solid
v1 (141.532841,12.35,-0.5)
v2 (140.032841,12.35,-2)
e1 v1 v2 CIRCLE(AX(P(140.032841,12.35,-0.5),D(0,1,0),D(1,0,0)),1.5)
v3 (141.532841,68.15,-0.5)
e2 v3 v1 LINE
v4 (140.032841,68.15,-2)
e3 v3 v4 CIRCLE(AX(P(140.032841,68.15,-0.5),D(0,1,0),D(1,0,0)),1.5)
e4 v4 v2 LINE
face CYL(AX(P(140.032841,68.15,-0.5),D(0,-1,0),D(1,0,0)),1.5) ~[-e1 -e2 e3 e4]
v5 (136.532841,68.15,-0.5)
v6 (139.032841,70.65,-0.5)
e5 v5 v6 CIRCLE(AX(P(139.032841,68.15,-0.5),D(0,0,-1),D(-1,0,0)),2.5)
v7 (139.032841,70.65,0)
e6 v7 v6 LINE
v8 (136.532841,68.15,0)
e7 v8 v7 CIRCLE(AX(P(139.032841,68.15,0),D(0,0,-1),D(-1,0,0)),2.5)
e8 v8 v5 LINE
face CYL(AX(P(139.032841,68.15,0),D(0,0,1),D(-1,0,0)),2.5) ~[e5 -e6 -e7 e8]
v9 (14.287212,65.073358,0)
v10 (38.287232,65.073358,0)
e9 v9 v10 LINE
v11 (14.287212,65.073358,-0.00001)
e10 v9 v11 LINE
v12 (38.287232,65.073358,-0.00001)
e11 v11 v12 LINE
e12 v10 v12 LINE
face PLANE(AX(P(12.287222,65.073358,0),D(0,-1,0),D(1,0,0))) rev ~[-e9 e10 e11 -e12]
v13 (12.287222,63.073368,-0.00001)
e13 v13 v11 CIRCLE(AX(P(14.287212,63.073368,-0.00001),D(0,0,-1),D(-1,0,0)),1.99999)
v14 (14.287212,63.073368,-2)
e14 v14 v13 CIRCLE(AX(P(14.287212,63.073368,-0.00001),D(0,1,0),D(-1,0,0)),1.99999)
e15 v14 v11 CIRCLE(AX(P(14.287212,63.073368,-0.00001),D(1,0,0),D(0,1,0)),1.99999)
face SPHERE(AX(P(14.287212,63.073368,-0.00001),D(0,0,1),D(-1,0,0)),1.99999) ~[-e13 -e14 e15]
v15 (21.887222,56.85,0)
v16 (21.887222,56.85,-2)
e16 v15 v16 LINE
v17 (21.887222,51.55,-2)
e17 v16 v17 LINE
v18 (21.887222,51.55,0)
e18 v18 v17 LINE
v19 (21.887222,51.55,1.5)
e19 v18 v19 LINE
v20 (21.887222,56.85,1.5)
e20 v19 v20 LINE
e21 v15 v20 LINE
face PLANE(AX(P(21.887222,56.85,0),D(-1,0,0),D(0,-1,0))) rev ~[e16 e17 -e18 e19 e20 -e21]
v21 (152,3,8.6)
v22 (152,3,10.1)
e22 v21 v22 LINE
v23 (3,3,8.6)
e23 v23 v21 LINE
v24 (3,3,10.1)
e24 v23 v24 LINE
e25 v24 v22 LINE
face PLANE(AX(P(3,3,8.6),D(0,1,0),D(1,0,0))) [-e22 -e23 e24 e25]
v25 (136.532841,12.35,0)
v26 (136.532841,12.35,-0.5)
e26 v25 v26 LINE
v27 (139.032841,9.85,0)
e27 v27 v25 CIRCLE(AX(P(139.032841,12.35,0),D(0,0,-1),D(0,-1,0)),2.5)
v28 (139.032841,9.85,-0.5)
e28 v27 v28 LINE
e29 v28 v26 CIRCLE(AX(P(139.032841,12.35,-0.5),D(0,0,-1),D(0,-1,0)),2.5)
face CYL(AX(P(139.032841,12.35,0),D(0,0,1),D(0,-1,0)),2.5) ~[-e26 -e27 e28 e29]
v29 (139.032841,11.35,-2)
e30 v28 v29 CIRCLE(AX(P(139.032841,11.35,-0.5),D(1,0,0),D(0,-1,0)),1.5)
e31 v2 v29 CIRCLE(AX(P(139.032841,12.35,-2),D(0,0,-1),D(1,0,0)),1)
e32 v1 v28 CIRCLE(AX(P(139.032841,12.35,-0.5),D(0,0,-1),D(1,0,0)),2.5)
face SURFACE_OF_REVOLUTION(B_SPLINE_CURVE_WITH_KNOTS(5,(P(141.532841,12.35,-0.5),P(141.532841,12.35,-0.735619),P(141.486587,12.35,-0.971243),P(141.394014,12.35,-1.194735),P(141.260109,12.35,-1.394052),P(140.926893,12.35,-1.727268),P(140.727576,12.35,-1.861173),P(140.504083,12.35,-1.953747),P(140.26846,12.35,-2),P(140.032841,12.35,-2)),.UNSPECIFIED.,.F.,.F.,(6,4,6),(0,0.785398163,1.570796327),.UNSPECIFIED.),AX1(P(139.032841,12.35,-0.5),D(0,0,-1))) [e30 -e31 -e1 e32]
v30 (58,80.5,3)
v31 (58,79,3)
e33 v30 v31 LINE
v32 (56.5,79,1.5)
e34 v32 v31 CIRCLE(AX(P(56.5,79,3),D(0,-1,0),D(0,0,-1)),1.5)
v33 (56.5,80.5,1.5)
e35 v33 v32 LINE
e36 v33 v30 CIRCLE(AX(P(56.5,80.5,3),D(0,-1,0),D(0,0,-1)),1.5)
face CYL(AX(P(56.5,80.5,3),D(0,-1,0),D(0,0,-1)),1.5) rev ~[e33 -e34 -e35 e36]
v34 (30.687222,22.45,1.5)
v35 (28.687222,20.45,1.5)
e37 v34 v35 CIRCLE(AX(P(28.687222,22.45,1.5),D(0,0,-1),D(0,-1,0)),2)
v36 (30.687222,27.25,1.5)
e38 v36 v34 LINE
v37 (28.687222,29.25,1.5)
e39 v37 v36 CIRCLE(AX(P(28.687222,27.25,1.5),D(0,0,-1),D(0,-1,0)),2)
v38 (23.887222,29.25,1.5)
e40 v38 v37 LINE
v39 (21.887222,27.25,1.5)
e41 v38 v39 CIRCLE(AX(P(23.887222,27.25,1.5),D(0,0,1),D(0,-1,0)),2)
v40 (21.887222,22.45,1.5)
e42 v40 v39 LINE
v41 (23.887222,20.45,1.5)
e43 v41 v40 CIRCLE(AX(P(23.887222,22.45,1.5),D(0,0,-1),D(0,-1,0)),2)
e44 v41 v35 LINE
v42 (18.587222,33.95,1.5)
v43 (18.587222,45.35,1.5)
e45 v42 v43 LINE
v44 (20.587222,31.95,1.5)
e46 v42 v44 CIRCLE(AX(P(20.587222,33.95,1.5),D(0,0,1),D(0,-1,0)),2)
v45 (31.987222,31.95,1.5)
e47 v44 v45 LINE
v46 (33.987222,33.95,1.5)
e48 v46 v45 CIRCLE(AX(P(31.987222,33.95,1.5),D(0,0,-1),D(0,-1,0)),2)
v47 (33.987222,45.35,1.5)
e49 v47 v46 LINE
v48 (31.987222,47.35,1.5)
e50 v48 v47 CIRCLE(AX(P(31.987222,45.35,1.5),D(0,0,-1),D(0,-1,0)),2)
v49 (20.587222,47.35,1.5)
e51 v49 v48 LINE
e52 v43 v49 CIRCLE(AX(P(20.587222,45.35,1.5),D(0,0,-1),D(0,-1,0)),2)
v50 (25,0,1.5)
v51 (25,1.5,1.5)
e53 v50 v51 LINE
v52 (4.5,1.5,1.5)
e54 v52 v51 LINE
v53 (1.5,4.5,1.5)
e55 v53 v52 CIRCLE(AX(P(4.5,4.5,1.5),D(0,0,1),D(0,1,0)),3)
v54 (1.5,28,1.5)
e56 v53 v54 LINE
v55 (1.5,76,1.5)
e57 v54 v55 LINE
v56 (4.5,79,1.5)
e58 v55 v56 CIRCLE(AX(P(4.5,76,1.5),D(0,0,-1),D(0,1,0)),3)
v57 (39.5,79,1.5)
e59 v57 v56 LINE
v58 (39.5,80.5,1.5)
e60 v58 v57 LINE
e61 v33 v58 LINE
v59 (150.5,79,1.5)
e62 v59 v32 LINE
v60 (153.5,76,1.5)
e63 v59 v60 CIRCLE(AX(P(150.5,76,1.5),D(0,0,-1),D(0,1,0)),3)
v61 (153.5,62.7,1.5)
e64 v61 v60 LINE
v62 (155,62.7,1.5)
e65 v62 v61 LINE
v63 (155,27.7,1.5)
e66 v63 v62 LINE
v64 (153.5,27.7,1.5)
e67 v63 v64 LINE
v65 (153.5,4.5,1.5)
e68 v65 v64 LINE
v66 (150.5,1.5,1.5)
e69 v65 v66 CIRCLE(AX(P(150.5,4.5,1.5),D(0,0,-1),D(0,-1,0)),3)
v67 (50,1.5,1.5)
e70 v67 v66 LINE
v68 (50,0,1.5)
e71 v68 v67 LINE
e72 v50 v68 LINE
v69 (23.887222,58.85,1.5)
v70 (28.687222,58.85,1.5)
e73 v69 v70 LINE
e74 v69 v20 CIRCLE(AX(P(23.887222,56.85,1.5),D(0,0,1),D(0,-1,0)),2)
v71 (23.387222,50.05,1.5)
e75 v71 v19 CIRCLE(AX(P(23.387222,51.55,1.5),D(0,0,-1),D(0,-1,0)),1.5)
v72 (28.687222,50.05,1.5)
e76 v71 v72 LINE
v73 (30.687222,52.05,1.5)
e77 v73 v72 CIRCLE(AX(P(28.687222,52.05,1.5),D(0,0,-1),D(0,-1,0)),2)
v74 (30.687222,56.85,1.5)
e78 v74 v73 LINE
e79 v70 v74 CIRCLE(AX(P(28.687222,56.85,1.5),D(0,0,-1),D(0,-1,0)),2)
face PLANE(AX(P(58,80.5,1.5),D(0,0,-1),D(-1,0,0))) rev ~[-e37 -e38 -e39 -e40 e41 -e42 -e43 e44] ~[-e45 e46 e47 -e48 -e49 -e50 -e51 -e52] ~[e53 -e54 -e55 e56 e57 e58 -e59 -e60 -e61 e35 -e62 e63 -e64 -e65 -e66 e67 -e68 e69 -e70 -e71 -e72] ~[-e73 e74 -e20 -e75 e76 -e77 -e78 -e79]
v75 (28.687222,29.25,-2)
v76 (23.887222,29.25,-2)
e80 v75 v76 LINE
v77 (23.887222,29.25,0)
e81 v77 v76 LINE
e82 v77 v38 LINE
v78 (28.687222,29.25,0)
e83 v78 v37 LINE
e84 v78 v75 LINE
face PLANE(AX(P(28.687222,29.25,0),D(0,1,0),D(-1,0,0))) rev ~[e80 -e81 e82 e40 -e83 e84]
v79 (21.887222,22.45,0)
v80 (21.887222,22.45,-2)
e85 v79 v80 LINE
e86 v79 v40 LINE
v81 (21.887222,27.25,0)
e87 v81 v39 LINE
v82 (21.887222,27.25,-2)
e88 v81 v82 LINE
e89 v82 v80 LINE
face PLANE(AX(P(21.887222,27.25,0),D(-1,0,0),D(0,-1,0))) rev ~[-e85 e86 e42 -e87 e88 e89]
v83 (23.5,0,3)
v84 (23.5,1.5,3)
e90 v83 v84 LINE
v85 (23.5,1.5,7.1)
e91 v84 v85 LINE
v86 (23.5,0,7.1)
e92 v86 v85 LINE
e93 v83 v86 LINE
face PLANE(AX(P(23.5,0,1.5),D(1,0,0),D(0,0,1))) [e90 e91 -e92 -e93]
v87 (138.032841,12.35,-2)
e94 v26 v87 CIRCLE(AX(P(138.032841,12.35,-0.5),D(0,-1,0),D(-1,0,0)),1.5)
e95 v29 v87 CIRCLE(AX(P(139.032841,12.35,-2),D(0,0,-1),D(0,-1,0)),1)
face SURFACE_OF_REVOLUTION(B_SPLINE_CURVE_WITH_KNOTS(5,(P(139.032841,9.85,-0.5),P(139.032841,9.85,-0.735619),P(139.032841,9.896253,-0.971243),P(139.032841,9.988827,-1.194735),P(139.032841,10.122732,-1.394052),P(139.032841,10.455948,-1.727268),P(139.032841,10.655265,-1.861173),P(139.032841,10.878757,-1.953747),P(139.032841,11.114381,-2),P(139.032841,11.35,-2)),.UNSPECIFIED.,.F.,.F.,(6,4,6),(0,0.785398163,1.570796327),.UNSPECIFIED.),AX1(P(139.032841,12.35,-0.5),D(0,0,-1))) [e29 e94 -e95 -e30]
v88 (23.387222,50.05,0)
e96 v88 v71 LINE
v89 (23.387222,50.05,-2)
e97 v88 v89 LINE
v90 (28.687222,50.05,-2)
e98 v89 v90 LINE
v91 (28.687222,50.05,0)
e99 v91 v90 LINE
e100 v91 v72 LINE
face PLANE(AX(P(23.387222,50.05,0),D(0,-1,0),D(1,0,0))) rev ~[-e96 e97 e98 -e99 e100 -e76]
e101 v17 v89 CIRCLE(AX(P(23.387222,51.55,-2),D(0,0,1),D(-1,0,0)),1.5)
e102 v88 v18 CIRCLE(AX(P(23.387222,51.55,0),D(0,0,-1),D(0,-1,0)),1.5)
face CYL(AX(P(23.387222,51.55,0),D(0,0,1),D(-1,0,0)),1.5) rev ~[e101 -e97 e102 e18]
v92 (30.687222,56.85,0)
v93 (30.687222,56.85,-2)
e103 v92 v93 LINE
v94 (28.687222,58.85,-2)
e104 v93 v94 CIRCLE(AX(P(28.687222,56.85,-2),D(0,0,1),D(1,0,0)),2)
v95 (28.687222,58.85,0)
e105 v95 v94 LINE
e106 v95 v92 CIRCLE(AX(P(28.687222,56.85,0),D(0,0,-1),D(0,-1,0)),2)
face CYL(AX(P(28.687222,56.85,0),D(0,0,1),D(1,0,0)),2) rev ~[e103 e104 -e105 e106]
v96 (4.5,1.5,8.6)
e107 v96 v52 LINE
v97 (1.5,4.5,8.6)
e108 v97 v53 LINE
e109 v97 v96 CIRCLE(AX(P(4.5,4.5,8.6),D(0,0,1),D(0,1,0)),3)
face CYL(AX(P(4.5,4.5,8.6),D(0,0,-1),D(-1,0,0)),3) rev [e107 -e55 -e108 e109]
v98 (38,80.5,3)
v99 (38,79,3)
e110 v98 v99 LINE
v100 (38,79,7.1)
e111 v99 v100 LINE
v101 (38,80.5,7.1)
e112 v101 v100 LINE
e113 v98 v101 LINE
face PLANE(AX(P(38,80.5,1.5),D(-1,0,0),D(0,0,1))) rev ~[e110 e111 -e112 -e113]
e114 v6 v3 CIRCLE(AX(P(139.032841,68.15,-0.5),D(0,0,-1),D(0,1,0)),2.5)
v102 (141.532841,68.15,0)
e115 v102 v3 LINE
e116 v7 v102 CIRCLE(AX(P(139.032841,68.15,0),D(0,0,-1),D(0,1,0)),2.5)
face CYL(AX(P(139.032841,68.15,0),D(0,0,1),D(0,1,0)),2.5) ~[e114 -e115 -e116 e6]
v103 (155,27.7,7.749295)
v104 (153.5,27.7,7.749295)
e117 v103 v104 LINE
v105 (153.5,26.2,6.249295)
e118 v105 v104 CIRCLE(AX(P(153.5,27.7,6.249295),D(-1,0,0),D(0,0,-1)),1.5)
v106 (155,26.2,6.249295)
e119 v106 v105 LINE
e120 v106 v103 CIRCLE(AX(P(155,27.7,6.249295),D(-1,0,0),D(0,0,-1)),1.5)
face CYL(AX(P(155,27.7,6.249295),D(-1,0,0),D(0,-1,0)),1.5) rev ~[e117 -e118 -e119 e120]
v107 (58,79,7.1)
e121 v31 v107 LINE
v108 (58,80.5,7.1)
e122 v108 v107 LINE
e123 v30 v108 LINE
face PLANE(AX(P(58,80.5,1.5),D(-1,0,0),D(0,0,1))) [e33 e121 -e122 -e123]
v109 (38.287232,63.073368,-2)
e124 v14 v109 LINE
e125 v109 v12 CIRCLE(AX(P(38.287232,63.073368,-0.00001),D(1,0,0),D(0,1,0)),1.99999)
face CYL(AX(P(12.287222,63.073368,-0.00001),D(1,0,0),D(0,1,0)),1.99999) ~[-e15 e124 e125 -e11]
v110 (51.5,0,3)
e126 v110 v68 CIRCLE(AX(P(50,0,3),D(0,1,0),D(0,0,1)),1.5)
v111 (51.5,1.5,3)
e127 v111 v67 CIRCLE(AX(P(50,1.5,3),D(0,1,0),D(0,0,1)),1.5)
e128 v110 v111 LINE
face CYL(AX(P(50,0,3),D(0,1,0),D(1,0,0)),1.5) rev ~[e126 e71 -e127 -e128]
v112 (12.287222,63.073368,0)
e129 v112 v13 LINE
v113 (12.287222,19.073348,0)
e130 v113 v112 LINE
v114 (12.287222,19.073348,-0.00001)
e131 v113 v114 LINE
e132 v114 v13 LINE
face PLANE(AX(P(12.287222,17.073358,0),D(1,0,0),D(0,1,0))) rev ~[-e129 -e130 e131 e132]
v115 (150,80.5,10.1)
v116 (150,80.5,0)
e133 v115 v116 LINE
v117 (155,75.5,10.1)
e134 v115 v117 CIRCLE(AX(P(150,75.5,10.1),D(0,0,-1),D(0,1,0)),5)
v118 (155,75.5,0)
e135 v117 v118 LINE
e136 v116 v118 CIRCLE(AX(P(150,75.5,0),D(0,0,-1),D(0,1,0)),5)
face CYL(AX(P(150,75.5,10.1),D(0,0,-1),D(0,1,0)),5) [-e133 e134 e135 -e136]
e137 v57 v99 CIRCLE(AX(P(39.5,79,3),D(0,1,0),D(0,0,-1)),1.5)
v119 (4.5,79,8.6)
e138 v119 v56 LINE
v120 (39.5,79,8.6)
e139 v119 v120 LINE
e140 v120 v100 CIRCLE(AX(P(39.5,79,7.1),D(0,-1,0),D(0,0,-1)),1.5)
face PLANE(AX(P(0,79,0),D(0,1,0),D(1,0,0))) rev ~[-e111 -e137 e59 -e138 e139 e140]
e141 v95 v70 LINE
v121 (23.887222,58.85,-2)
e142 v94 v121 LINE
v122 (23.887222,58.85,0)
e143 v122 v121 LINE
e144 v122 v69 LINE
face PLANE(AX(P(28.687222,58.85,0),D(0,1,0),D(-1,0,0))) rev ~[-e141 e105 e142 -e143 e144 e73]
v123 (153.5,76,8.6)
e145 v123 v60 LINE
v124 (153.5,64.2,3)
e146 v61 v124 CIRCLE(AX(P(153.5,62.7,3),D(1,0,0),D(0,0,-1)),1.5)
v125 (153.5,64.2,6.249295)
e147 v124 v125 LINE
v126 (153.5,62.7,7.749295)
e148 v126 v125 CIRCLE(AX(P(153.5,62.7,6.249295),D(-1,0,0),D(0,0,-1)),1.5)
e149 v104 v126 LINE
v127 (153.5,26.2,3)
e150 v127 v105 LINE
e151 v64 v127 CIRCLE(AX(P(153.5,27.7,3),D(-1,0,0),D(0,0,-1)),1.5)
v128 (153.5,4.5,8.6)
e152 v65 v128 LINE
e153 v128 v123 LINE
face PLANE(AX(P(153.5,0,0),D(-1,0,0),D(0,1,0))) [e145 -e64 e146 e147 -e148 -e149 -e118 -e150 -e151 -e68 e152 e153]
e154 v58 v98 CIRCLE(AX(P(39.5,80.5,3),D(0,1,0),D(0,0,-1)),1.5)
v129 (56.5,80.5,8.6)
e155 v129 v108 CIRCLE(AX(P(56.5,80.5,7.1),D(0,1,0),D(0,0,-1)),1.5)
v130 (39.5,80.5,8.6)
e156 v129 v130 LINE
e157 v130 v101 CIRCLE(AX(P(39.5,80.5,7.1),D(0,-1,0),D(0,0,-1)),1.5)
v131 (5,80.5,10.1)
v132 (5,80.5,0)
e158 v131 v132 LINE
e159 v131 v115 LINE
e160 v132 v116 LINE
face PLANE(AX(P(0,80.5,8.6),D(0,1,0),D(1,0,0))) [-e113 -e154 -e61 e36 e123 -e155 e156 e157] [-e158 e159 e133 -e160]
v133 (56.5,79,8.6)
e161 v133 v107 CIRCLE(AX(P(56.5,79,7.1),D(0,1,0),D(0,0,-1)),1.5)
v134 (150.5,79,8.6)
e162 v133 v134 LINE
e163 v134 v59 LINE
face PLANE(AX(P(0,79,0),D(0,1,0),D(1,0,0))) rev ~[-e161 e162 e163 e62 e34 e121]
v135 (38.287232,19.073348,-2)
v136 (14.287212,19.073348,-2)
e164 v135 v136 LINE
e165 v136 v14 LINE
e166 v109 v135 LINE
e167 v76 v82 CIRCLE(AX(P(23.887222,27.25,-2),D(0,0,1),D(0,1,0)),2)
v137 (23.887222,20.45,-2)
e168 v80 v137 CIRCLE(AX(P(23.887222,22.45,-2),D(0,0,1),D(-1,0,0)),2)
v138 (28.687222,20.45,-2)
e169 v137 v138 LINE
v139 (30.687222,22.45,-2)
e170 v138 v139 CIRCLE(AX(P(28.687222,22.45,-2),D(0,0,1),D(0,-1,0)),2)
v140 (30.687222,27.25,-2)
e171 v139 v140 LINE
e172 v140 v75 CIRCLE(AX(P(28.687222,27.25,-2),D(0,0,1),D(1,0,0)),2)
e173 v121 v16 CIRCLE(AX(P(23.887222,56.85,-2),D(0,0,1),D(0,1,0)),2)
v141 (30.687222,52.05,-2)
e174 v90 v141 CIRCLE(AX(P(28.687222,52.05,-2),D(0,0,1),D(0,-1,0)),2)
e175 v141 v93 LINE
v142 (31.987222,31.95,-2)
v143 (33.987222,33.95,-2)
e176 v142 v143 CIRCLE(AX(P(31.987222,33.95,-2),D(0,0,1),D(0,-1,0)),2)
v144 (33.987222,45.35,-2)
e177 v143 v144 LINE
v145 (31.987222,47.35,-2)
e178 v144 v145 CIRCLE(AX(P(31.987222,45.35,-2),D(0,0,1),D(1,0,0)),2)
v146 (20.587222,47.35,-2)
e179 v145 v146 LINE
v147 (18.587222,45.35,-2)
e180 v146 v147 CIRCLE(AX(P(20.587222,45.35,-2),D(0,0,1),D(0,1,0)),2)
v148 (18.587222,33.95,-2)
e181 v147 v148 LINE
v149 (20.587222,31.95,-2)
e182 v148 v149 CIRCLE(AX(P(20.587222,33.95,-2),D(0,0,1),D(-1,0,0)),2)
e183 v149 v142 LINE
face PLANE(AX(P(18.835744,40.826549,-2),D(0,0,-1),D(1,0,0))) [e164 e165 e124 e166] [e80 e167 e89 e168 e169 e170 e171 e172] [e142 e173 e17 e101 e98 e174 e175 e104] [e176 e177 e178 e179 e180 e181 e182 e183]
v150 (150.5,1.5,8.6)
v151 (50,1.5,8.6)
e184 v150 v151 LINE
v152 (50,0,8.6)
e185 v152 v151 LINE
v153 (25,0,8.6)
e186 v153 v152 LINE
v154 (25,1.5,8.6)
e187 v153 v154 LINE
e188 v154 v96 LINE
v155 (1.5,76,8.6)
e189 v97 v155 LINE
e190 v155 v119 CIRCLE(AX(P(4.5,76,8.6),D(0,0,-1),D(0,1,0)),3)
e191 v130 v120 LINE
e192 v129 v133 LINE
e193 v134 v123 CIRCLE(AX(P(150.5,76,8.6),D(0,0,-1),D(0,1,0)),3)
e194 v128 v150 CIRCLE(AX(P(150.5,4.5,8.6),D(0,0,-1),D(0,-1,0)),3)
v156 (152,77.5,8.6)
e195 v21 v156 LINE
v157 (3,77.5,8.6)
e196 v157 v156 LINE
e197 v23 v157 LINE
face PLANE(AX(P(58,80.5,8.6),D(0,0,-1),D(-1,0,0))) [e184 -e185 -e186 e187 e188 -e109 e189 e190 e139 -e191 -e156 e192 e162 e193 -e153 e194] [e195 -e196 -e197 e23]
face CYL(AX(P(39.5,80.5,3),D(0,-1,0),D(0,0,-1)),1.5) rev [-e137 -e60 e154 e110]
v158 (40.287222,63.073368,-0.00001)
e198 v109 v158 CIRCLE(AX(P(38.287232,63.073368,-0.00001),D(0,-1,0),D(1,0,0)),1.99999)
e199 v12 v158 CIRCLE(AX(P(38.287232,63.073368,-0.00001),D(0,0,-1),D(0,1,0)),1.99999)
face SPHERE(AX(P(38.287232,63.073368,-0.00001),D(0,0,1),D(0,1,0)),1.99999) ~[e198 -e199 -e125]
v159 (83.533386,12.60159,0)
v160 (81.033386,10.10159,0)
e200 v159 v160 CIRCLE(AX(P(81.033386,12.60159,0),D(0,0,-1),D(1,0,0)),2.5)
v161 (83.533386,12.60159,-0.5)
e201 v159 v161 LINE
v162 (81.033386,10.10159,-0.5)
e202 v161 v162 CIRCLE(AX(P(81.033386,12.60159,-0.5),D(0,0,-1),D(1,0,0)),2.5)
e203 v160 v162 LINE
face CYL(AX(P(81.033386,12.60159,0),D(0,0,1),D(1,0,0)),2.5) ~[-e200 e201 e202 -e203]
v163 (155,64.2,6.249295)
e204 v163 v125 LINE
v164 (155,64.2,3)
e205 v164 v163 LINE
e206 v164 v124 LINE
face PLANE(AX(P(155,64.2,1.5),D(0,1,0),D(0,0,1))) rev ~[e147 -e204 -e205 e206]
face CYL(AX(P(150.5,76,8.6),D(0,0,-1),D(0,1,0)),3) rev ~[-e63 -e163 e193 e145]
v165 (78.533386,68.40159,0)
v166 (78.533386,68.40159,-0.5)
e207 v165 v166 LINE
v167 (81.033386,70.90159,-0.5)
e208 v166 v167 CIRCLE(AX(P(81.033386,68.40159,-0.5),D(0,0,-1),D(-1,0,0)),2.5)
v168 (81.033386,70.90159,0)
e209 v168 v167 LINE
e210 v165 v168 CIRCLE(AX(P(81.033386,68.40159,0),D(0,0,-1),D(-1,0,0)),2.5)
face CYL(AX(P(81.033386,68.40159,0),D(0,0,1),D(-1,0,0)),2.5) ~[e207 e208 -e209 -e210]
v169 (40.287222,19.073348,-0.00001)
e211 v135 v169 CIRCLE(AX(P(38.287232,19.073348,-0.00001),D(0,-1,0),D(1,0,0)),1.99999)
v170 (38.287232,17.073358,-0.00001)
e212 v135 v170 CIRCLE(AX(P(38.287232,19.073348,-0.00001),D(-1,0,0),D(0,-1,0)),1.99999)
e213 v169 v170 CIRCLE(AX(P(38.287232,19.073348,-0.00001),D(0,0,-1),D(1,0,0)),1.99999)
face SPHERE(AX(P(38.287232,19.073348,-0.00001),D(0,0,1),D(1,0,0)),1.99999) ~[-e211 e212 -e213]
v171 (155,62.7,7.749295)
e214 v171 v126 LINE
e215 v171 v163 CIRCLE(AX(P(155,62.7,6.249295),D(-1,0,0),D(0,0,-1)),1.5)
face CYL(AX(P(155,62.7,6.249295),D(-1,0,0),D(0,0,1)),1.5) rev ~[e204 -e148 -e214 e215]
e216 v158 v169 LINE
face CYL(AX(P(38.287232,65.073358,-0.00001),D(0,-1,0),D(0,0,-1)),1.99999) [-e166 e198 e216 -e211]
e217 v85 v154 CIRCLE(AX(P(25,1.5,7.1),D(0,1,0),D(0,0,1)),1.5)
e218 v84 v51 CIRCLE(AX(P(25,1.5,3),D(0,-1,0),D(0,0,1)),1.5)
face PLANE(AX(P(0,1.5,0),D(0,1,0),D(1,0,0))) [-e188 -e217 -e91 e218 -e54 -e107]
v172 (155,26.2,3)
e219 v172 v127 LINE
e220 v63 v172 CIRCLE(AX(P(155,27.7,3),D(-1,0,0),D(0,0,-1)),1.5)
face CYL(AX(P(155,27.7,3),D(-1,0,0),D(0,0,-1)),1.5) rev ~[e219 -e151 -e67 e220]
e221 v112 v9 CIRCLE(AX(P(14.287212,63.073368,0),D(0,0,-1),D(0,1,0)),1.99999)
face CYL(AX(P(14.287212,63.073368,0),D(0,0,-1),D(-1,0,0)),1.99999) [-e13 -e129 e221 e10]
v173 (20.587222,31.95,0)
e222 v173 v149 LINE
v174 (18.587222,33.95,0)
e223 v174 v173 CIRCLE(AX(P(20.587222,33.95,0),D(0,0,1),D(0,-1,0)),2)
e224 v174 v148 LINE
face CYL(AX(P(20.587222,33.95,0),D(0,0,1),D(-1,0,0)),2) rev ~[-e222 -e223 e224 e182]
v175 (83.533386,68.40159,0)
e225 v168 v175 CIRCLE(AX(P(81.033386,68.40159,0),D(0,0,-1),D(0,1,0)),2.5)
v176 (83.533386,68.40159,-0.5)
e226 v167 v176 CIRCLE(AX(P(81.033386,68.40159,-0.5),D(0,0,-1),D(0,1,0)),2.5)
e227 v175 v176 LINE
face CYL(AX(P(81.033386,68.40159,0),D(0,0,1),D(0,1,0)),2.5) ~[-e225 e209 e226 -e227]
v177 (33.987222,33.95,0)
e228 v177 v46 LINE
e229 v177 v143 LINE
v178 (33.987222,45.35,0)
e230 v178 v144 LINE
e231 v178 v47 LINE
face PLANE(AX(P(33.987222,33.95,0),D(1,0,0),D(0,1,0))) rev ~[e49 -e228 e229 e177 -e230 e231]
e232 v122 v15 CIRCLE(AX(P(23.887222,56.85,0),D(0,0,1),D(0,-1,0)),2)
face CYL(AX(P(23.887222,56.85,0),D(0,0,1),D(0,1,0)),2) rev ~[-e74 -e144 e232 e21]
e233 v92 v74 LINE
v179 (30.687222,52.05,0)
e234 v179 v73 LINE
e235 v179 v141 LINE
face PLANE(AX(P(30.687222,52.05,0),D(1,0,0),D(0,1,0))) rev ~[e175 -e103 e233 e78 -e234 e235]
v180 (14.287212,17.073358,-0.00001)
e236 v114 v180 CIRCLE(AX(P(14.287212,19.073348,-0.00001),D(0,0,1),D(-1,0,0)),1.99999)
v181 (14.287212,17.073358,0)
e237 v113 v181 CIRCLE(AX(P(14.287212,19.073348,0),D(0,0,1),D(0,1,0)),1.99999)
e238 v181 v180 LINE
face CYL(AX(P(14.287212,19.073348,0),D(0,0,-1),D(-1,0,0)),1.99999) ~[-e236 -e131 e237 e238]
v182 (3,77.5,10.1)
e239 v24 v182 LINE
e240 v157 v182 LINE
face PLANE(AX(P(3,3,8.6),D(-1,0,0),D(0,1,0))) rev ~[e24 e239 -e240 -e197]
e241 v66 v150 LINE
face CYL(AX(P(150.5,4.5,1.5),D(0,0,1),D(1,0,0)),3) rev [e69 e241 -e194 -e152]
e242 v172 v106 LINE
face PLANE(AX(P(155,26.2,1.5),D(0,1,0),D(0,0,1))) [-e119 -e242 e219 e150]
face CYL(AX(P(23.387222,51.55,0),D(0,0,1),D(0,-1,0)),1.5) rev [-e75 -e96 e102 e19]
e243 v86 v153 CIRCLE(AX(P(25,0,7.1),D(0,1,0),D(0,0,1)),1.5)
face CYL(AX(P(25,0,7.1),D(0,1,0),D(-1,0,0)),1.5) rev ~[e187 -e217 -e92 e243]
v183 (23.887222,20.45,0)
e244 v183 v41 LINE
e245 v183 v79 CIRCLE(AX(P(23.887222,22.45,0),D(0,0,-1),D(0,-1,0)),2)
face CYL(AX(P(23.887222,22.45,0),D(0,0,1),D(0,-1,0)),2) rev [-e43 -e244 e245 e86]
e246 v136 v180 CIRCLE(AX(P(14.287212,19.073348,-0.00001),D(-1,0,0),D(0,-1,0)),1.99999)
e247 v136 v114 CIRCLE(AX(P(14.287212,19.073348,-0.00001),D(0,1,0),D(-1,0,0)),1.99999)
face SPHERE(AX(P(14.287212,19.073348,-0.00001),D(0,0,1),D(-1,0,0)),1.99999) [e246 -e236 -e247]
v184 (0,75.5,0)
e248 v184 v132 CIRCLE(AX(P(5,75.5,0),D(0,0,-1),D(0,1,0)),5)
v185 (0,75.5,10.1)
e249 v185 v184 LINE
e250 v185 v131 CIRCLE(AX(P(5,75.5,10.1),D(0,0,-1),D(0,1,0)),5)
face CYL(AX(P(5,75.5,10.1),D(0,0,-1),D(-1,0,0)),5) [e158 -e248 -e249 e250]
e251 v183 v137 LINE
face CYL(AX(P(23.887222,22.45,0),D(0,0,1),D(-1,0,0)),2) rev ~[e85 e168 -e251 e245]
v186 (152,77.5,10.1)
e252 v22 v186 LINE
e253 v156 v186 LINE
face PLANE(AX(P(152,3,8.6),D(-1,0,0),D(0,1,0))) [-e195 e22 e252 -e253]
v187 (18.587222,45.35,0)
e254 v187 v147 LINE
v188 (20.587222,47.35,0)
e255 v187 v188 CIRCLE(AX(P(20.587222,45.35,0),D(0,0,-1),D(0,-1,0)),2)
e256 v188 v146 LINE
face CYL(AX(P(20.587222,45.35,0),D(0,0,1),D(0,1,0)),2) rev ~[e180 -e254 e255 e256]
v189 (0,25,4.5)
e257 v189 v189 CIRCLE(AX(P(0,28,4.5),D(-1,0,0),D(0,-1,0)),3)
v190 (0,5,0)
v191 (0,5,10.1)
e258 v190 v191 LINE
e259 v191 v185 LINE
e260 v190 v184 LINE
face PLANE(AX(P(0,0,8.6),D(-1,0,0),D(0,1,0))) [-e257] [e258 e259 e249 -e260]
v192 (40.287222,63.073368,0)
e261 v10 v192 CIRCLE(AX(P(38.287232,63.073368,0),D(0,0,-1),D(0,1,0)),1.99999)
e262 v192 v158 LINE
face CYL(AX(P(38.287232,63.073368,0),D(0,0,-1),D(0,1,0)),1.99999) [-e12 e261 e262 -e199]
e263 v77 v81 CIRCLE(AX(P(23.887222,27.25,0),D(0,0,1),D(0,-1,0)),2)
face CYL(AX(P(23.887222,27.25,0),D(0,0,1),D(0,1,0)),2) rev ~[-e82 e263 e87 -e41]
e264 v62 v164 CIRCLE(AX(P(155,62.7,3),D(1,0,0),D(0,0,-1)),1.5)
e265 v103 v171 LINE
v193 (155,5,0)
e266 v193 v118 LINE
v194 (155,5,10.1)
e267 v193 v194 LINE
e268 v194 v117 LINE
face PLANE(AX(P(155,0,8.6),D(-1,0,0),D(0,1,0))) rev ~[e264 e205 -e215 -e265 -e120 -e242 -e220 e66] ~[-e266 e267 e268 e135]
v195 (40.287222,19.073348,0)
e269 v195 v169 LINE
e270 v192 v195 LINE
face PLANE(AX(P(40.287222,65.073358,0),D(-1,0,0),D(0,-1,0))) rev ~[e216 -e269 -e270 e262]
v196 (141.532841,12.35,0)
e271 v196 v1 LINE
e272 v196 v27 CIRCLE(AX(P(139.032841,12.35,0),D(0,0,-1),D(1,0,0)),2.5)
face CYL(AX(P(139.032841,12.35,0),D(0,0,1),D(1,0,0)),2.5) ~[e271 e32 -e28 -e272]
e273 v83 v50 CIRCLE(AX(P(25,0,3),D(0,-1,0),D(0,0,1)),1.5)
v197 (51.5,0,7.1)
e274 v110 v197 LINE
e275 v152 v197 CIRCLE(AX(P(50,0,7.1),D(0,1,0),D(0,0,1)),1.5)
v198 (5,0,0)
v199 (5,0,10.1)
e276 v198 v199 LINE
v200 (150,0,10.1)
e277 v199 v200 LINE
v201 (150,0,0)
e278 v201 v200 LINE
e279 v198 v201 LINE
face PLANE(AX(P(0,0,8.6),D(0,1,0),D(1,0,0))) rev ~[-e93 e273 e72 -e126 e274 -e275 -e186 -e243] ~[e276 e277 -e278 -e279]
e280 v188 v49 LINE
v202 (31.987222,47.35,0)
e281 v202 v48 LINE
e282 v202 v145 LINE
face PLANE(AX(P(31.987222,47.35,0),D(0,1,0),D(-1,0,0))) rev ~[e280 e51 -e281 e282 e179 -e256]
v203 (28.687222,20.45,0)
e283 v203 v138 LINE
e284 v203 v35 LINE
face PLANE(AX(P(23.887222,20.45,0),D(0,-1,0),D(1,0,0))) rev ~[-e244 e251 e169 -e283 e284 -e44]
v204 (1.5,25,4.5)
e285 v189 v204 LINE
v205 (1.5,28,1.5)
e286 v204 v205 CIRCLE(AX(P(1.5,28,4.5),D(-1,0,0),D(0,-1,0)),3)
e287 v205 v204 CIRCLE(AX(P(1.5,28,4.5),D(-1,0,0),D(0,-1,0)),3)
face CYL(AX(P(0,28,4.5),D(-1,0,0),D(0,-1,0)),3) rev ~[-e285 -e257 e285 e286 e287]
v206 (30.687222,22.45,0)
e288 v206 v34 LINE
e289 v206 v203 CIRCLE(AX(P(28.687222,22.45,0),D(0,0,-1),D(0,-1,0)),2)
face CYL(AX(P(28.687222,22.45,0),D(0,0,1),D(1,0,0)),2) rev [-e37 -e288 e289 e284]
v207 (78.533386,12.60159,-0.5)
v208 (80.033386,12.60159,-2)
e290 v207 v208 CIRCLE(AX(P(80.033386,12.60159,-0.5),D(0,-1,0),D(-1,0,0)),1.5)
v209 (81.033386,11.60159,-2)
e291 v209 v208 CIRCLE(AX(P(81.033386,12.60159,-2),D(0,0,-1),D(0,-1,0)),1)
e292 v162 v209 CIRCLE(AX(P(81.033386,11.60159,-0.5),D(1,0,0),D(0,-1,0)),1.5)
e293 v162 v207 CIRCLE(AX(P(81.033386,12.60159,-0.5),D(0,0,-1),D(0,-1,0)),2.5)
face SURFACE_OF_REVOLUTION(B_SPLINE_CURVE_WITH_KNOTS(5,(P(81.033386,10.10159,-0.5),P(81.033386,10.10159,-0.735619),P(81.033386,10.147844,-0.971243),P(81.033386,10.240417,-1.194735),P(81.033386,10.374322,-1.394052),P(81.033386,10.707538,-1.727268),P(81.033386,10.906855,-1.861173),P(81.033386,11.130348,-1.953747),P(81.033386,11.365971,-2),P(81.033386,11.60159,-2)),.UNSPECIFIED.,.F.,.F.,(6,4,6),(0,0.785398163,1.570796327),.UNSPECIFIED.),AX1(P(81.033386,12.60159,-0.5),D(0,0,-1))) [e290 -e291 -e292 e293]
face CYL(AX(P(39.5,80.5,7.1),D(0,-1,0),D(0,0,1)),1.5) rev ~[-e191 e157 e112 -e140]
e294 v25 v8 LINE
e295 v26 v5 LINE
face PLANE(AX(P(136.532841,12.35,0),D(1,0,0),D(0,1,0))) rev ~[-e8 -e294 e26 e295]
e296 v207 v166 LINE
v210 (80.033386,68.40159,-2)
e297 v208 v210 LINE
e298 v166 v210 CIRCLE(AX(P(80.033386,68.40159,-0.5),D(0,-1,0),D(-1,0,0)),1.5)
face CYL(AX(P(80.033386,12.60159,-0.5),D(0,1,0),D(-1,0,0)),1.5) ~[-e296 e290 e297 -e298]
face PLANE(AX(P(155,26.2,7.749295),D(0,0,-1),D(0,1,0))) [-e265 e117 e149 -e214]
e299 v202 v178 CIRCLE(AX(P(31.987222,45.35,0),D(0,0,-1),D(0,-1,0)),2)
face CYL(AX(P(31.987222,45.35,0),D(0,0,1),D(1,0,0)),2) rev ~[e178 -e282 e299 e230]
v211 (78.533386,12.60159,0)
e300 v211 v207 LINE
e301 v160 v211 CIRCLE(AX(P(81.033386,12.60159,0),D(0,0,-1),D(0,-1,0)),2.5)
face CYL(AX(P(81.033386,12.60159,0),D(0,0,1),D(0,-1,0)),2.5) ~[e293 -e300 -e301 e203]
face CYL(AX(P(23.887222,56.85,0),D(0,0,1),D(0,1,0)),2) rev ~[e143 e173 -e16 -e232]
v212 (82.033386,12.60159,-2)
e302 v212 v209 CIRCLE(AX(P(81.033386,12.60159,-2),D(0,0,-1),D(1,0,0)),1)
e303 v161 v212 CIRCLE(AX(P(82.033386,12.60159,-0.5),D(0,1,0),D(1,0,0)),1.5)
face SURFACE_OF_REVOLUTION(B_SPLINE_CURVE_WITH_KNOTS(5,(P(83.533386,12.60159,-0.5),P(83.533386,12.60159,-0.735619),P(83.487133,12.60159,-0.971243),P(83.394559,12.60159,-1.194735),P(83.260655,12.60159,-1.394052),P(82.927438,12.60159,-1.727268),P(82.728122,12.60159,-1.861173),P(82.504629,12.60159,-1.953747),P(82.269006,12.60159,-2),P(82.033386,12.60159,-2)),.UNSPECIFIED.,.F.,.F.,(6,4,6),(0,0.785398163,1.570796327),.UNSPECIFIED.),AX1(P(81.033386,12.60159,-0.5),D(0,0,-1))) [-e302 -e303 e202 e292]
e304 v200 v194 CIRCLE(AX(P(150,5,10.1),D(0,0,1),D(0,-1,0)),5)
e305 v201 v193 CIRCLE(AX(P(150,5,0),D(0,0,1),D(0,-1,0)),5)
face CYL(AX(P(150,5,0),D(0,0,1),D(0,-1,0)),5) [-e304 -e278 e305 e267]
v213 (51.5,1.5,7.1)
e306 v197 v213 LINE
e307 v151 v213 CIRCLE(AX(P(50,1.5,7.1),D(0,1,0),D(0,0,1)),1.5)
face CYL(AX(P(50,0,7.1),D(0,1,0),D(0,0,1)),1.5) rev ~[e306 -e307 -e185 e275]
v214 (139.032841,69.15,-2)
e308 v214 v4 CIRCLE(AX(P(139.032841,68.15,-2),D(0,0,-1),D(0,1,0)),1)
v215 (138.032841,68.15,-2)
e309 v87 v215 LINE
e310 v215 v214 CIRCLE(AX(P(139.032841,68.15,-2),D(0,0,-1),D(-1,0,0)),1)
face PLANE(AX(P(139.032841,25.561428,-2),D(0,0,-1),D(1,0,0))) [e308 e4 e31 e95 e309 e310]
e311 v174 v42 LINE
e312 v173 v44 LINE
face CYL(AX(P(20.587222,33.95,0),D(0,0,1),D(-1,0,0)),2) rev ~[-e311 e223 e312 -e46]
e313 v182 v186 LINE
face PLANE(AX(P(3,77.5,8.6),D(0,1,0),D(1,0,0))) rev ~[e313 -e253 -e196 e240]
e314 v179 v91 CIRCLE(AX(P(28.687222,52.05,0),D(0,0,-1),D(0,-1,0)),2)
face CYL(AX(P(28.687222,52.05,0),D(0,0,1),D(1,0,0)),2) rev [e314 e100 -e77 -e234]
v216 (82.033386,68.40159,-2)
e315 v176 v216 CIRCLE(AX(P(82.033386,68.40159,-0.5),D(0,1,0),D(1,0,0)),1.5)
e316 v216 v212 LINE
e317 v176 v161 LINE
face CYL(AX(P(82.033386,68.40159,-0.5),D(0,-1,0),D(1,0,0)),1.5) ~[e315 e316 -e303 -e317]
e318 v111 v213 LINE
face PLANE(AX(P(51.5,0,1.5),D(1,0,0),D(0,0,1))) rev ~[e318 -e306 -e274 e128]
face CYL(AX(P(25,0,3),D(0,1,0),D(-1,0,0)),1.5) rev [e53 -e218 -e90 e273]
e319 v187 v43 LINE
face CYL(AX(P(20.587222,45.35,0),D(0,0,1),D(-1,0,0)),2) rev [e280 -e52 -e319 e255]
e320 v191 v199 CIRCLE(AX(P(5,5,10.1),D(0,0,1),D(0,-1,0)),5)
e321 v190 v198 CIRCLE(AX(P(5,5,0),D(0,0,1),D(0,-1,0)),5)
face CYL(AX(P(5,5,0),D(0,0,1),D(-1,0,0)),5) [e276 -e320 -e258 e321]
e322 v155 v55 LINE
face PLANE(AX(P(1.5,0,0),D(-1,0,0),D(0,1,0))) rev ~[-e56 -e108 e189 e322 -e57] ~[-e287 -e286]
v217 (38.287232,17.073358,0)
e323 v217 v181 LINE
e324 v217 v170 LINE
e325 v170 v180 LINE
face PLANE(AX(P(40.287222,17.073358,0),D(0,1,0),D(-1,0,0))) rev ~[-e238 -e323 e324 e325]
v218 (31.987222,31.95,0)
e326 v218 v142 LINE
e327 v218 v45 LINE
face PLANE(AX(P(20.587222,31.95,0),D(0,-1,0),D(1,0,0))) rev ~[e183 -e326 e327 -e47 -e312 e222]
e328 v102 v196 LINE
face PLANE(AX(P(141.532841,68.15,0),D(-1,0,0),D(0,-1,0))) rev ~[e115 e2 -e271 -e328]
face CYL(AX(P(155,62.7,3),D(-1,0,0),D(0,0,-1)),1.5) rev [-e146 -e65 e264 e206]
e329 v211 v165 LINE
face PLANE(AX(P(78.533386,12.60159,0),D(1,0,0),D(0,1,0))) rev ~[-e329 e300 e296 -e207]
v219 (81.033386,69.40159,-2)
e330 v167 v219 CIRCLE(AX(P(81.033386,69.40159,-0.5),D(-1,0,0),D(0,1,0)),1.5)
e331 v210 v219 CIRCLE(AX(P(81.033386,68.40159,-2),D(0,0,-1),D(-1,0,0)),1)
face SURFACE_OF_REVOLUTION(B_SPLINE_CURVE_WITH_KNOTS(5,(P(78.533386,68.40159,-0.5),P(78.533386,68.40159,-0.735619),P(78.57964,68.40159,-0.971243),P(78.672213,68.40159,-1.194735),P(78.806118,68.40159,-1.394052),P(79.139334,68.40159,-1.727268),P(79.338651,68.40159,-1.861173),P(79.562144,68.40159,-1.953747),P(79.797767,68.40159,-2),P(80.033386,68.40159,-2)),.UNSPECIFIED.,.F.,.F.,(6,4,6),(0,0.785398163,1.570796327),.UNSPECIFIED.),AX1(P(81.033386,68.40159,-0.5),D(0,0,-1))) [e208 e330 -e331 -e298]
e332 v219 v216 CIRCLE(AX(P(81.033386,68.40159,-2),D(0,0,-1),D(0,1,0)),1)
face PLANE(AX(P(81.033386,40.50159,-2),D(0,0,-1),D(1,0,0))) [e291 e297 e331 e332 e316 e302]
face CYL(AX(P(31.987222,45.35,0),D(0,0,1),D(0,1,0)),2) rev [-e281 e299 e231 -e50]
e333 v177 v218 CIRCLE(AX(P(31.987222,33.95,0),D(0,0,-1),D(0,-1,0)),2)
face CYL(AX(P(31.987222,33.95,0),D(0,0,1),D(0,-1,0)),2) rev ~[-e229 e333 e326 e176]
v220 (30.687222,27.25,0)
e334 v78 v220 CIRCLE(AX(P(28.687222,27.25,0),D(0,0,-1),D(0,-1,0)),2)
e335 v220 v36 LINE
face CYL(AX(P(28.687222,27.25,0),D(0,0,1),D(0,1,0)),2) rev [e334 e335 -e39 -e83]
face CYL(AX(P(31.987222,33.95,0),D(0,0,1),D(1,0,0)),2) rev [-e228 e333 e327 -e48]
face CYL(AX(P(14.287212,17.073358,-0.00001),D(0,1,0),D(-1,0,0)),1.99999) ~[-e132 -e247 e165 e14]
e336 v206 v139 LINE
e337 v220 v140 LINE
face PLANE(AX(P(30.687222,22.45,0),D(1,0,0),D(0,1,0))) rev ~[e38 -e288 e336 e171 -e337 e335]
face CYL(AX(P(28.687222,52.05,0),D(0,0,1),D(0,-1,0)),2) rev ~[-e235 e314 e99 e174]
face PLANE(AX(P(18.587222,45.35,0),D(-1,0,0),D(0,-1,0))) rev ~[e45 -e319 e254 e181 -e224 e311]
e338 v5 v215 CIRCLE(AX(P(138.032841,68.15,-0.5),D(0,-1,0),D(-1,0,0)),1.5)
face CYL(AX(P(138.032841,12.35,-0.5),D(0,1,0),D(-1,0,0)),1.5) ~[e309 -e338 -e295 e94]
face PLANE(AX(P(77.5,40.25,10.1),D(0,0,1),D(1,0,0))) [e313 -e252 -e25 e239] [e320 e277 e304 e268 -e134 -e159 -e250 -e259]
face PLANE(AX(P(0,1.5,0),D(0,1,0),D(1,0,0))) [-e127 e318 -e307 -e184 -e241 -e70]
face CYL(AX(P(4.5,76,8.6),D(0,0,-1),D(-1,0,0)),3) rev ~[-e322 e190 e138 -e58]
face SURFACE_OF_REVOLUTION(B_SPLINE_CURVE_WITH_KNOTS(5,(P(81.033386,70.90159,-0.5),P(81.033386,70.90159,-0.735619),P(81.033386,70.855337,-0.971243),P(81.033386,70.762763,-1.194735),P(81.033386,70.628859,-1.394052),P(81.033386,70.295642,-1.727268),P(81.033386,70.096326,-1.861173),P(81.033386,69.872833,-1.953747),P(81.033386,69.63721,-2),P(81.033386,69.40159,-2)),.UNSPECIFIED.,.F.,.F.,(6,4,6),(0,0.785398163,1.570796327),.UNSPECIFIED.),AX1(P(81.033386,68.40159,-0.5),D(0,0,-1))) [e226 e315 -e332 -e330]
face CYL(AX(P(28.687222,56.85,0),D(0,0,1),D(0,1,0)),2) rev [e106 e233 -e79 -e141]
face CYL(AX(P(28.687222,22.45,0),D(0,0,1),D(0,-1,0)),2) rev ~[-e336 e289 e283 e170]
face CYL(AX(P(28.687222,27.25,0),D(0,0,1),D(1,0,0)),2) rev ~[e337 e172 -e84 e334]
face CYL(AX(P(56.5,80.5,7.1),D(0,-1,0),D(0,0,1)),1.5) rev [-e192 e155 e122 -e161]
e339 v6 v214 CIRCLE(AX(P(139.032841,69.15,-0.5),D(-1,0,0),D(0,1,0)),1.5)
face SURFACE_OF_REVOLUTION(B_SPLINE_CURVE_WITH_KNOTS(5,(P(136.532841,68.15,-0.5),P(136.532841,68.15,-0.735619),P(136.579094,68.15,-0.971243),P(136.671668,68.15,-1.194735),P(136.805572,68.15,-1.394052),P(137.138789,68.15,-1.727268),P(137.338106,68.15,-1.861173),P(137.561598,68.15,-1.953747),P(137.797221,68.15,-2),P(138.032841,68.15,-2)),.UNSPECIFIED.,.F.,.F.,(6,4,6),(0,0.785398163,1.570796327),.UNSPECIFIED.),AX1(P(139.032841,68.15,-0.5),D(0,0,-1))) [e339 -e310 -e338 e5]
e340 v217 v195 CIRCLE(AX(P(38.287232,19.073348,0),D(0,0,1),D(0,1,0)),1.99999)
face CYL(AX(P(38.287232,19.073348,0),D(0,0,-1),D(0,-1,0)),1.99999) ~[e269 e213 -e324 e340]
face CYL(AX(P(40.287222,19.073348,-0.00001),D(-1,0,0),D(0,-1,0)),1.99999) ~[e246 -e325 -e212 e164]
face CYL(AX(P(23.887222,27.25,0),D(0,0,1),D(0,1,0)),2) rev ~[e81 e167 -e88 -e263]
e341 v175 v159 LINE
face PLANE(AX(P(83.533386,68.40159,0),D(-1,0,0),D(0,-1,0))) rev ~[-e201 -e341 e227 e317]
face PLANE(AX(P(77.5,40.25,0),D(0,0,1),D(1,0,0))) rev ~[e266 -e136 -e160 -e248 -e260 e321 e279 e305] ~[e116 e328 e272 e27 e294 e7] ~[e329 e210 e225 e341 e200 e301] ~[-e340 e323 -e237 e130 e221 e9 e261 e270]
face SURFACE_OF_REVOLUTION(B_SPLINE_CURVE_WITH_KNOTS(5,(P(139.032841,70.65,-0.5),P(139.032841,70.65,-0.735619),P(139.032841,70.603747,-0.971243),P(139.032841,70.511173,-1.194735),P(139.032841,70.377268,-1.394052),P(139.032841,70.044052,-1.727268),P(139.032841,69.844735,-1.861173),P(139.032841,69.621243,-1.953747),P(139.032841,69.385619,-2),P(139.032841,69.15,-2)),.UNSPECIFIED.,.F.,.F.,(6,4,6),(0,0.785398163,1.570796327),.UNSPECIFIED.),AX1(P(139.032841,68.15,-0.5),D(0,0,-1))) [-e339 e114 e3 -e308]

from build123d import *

# Parameters (mm, degrees)
F0_W      = 155
F0_H      = 80.5
F1_DEPTH  = 8.6
F2_T      = -1.5
F3_W      = 155
F3_H      = 80.5
F3_W_2    = 152
F3_H_2    = 77.5
F3_W_3    = 149
F3_H_3    = 74.5
F4_DEPTH  = 1.5
F5_W      = 28
F5_H      = 7.1
F6_DEPTH  = 1.5
F7_W      = 20
F7_H      = 7.1
F8_DEPTH  = 1.5
F9_R      = 3
F10_DEPTH = 1.5
F11_W     = 38
F11_H     = 6.2492947091
F12_DEPTH = 1.5
F13_W     = 8.8
F13_H     = 4.4
F13_W_2   = 15.4
F13_H_2   = 7.7
F14_DEPTH = 1.5
F15_R     = 1.5
F16_R     = 2
F17_R     = 5
F18_R     = 3
F20_DEPTH = 2
F21_R     = 1.99999
F23_DEPTH = 2
F24_R     = 1.5
F25_DEPTH = 2
F26_R     = 1.5


# Not quite as in the source:
# - a fillet or chamfer is up to 0.001 mm smaller than in the source, because OpenCascade refuses the exact size


with BuildPart() as f1:
    # F0 (on Top) → F1 (new body)
    with BuildSketch(Plane.XY):
        with Locations((77.5, 40.25)):
            Rectangle(F0_W, F0_H)
    extrude(amount=F1_DEPTH)

    # F2
    f2_openings = [f1.faces().sort_by_distance(p)[0] for p in [
        (77.5, 40.25, 8.6),
    ]]
    offset(amount=F2_T, openings=f2_openings)

    # F3 (on face) → F4 (join)
    with BuildSketch(Plane.XY.offset(8.6)):
        with Locations((77.5, 40.25)):
            Rectangle(F3_W, F3_H)
        with Locations((77.5, 40.25)):
            Rectangle(F3_W_2, F3_H_2, mode=Mode.SUBTRACT)
        with Locations((77.5, 40.25)):
            Rectangle(F3_W_2, F3_H_2)
        with Locations((77.5, 40.25)):
            Rectangle(F3_W_3, F3_H_3, mode=Mode.SUBTRACT)
    extrude(amount=F4_DEPTH)

    # F5 (on face) → F6 (cut, through all)
    with BuildSketch(Plane.XZ):
        with Locations((37.5, 5.05)):
            Rectangle(F5_W, F5_H)
    extrude(amount=-F6_DEPTH, mode=Mode.SUBTRACT)

    # F7 (on face) → F8 (cut, through all)
    with BuildSketch(Plane(origin=(0, 80.5, 0), x_dir=(-1, 0, 0), z_dir=(0, 1, 0))):
        with Locations((-48, 5.05)):
            Rectangle(F7_W, F7_H)
    extrude(amount=-F8_DEPTH, mode=Mode.SUBTRACT)

    # F9 (on face) → F10 (cut, through all)
    with BuildSketch(Plane(origin=(0, 0, 0), x_dir=(0, -1, 0), z_dir=(-1, 0, 0))):
        with Locations((-28, 4.5)):
            Circle(F9_R)
    extrude(amount=-F10_DEPTH, mode=Mode.SUBTRACT)

    # F11 (on face) → F12 (cut, through all)
    with BuildSketch(Plane.YZ.offset(155)):
        with Locations((45.2, 4.6246473546)):
            Rectangle(F11_W, F11_H)
    extrude(amount=-F12_DEPTH, mode=Mode.SUBTRACT)

    # F13 (on face) → F14 (cut, through all)
    with BuildSketch(Plane(origin=(0, 0, 0), x_dir=(1, 0, 0), z_dir=(0, 0, -1))):
        with Locations((26.2872223049, -27.05)):
            Rectangle(F13_W, F13_H)
        with Locations((26.2872223049, -22.65)):
            Rectangle(F13_W, F13_H)
        with Locations((26.2872223049, -35.8)):
            Rectangle(F13_W_2, F13_H_2)
        with Locations((26.2872223049, -43.5)):
            Rectangle(F13_W_2, F13_H_2)
        with Locations((26.2872223049, -52.25)):
            Rectangle(F13_W, F13_H)
        with Locations((26.2872223049, -56.65)):
            Rectangle(F13_W, F13_H)
    extrude(amount=-F14_DEPTH, mode=Mode.SUBTRACT)

    # F15
    f15_edges = [f1.edges().sort_by_distance(p)[0] for p in [
        (23.5, 0.75, 8.6),
        (51.5, 0.75, 8.6),
        (51.5, 0.75, 1.5),
        (23.5, 0.75, 1.5),
        (154.25, 26.2, 7.749295),
        (154.25, 26.2, 1.5),
        (154.25, 64.2, 7.749295),
        (154.25, 64.2, 1.5),
        (58, 79.75, 8.6),
        (58, 79.75, 1.5),
        (38, 79.75, 8.6),
        (38, 79.75, 1.5),
        (21.887222, 50.05, 0.75),
    ]]
    fillet(f15_edges, radius=F15_R)

    # F16
    f16_edges = [f1.edges().sort_by_distance(p)[0] for p in [
        (21.887222, 29.25, 0.75),
        (18.587222, 47.35, 0.75),
        (21.887222, 58.85, 0.75),
        (21.887222, 20.45, 0.75),
        (18.587222, 31.95, 0.75),
        (30.687222, 50.05, 0.75),
        (33.987222, 31.95, 0.75),
        (30.687222, 20.45, 0.75),
        (30.687222, 29.25, 0.75),
        (33.987222, 47.35, 0.75),
        (30.687222, 58.85, 0.75),
    ]]
    fillet(f16_edges, radius=F16_R)

    # F17
    f17_edges = [f1.edges().sort_by_distance(p)[0] for p in [
        (0, 0, 5.05),
        (0, 80.5, 5.05),
        (155, 0, 5.05),
        (155, 80.5, 5.05),
    ]]
    fillet(f17_edges, radius=F17_R)

    # F18
    f18_edges = [f1.edges().sort_by_distance(p)[0] for p in [
        (1.5, 79, 5.05),
        (1.5, 1.5, 5.05),
        (153.5, 79, 5.05),
        (153.5, 1.5, 5.05),
    ]]
    fillet(f18_edges, radius=F18_R)

    # F19 (on face) → F20 (join)
    with BuildSketch(Plane(origin=(0, 0, 0), x_dir=(1, 0, 0), z_dir=(0, 0, -1))):
        with BuildLine():
            Line((26.2872223049, -17.0733576864), (12.2872223049, -17.0733576864))
            Line((12.2872223049, -17.0733576864), (12.2872223049, -65.0733576864))
            Line((12.2872223049, -65.0733576864), (26.2872223049, -65.0733576864))
            Line((26.2872223049, -65.0733576864), (26.2872223049, -58.85))
            Line((26.2872223049, -58.85), (23.8872223049, -58.85))
            ThreePointArc((23.8872223049, -58.85), (22.4730087426, -58.2642135624), (21.8872223049, -56.85))
            Line((21.8872223049, -56.85), (21.8872223049, -51.55))
            ThreePointArc((21.8872223049, -51.55), (22.3265621332, -50.4893398282), (23.3872223049, -50.05))
            Line((23.3872223049, -50.05), (26.2872223049, -50.05))
            Line((26.2872223049, -50.05), (26.2872223049, -47.35))
            Line((26.2872223049, -47.35), (20.5872223049, -47.35))
            ThreePointArc((20.5872223049, -47.35), (19.1730087426, -46.7642135624), (18.5872223049, -45.35))
            Line((18.5872223049, -45.35), (18.5872223049, -33.95))
            ThreePointArc((18.5872223049, -33.95), (19.1730087426, -32.5357864376), (20.5872223049, -31.95))
            Line((20.5872223049, -31.95), (26.2872223049, -31.95))
            Line((26.2872223049, -31.95), (26.2872223049, -29.25))
            Line((26.2872223049, -29.25), (23.8872223049, -29.25))
            ThreePointArc((23.8872223049, -29.25), (22.4730087426, -28.6642135624), (21.8872223049, -27.25))
            Line((21.8872223049, -27.25), (21.8872223049, -22.45))
            ThreePointArc((21.8872223049, -22.45), (22.4730087426, -21.0357864376), (23.8872223049, -20.45))
            Line((23.8872223049, -20.45), (26.2872223049, -20.45))
            Line((26.2872223049, -20.45), (26.2872223049, -17.0733576864))
        make_face()
        with BuildLine():
            Line((40.2872223049, -17.0733576864), (26.2872223049, -17.0733576864))
            Line((26.2872223049, -17.0733576864), (26.2872223049, -20.45))
            Line((26.2872223049, -20.45), (28.6872223049, -20.45))
            ThreePointArc((28.6872223049, -20.45), (30.1014358673, -21.0357864376), (30.6872223049, -22.45))
            Line((30.6872223049, -22.45), (30.6872223049, -27.25))
            ThreePointArc((30.6872223049, -27.25), (30.1014358673, -28.6642135624), (28.6872223049, -29.25))
            Line((28.6872223049, -29.25), (26.2872223049, -29.25))
            Line((26.2872223049, -29.25), (26.2872223049, -31.95))
            Line((26.2872223049, -31.95), (31.9872223049, -31.95))
            ThreePointArc((31.9872223049, -31.95), (33.4014358673, -32.5357864376), (33.9872223049, -33.95))
            Line((33.9872223049, -33.95), (33.9872223049, -45.35))
            ThreePointArc((33.9872223049, -45.35), (33.4014358673, -46.7642135624), (31.9872223049, -47.35))
            Line((31.9872223049, -47.35), (26.2872223049, -47.35))
            Line((26.2872223049, -47.35), (26.2872223049, -50.05))
            Line((26.2872223049, -50.05), (28.6872223049, -50.05))
            ThreePointArc((28.6872223049, -50.05), (30.1014358673, -50.6357864376), (30.6872223049, -52.05))
            Line((30.6872223049, -52.05), (30.6872223049, -56.85))
            ThreePointArc((30.6872223049, -56.85), (30.1014358673, -58.2642135624), (28.6872223049, -58.85))
            Line((28.6872223049, -58.85), (26.2872223049, -58.85))
            Line((26.2872223049, -58.85), (26.2872223049, -65.0733576864))
            Line((26.2872223049, -65.0733576864), (40.2872223049, -65.0733576864))
            Line((40.2872223049, -65.0733576864), (40.2872223049, -17.0733576864))
        make_face()
    extrude(amount=F20_DEPTH)

    # F21 (radius 2 in the source; OpenCascade refuses exactly that, so slightly less here)
    f21_edges = [f1.edges().sort_by_distance(p)[0] for p in [
        (12.287222, 17.073358, -1),
        (40.287222, 17.073358, -1),
        (12.287222, 65.073358, -1),
        (40.287222, 65.073358, -1),
        (12.287222, 41.073358, -2),
        (26.287222, 65.073358, -2),
        (40.287222, 41.073358, -2),
        (26.287222, 17.073358, -2),
    ]]
    fillet(f21_edges, radius=F21_R)

    # F22 (on face) → F23 (join)
    with BuildSketch(Plane(origin=(0, 0, 0), x_dir=(1, 0, 0), z_dir=(0, 0, -1))):
        with BuildLine():
            ThreePointArc((139.0328407288, -9.85), (137.2650737758, -10.582233047), (136.5328407288, -12.35))
            Line((136.5328407288, -12.35), (136.5328407288, -40.25))
            Line((136.5328407288, -40.25), (141.5328407288, -40.25))
            Line((141.5328407288, -40.25), (141.5328407288, -12.35))
            ThreePointArc((141.5328407288, -12.35), (140.8006076817, -10.582233047), (139.0328407288, -9.85))
        make_face()
        with BuildLine():
            Line((141.5328407288, -40.25), (136.5328407288, -40.25))
            Line((136.5328407288, -40.25), (136.5328407288, -68.15))
            ThreePointArc((136.5328407288, -68.15), (137.2650737758, -69.917766953), (139.0328407288, -70.65))
            ThreePointArc((139.0328407288, -70.65), (140.8006076817, -69.917766953), (141.5328407288, -68.15))
            Line((141.5328407288, -68.15), (141.5328407288, -40.25))
        make_face()
    extrude(amount=F23_DEPTH)

    # F24
    f24_edges = [f1.edges().sort_by_distance(p)[0] for p in [
        (139.032841, 9.85, -2),
    ]]
    fillet(f24_edges, radius=F24_R)

    # F22 (on face) → F25 (join)
    with BuildSketch(Plane(origin=(0, 0, 0), x_dir=(1, 0, 0), z_dir=(0, 0, -1))):
        with BuildLine():
            ThreePointArc((81.033386401, -10.1015902981), (79.265619448, -10.8338233452), (78.533386401, -12.6015902981))
            Line((78.533386401, -12.6015902981), (78.533386401, -68.4015902981))
            ThreePointArc((78.533386401, -68.4015902981), (79.265619448, -70.1693572511), (81.033386401, -70.9015902981))
            ThreePointArc((81.033386401, -70.9015902981), (82.8011533539, -70.1693572511), (83.533386401, -68.4015902981))
            Line((83.533386401, -68.4015902981), (83.533386401, -12.6015902981))
            ThreePointArc((83.533386401, -12.6015902981), (82.8011533539, -10.8338233452), (81.033386401, -10.1015902981))
        make_face()
    extrude(amount=F25_DEPTH)

    # F26
    f26_edges = [f1.edges().sort_by_distance(p)[0] for p in [
        (78.533386, 40.50159, -2),
    ]]
    fillet(f26_edges, radius=F26_R)


solid = f1.part
